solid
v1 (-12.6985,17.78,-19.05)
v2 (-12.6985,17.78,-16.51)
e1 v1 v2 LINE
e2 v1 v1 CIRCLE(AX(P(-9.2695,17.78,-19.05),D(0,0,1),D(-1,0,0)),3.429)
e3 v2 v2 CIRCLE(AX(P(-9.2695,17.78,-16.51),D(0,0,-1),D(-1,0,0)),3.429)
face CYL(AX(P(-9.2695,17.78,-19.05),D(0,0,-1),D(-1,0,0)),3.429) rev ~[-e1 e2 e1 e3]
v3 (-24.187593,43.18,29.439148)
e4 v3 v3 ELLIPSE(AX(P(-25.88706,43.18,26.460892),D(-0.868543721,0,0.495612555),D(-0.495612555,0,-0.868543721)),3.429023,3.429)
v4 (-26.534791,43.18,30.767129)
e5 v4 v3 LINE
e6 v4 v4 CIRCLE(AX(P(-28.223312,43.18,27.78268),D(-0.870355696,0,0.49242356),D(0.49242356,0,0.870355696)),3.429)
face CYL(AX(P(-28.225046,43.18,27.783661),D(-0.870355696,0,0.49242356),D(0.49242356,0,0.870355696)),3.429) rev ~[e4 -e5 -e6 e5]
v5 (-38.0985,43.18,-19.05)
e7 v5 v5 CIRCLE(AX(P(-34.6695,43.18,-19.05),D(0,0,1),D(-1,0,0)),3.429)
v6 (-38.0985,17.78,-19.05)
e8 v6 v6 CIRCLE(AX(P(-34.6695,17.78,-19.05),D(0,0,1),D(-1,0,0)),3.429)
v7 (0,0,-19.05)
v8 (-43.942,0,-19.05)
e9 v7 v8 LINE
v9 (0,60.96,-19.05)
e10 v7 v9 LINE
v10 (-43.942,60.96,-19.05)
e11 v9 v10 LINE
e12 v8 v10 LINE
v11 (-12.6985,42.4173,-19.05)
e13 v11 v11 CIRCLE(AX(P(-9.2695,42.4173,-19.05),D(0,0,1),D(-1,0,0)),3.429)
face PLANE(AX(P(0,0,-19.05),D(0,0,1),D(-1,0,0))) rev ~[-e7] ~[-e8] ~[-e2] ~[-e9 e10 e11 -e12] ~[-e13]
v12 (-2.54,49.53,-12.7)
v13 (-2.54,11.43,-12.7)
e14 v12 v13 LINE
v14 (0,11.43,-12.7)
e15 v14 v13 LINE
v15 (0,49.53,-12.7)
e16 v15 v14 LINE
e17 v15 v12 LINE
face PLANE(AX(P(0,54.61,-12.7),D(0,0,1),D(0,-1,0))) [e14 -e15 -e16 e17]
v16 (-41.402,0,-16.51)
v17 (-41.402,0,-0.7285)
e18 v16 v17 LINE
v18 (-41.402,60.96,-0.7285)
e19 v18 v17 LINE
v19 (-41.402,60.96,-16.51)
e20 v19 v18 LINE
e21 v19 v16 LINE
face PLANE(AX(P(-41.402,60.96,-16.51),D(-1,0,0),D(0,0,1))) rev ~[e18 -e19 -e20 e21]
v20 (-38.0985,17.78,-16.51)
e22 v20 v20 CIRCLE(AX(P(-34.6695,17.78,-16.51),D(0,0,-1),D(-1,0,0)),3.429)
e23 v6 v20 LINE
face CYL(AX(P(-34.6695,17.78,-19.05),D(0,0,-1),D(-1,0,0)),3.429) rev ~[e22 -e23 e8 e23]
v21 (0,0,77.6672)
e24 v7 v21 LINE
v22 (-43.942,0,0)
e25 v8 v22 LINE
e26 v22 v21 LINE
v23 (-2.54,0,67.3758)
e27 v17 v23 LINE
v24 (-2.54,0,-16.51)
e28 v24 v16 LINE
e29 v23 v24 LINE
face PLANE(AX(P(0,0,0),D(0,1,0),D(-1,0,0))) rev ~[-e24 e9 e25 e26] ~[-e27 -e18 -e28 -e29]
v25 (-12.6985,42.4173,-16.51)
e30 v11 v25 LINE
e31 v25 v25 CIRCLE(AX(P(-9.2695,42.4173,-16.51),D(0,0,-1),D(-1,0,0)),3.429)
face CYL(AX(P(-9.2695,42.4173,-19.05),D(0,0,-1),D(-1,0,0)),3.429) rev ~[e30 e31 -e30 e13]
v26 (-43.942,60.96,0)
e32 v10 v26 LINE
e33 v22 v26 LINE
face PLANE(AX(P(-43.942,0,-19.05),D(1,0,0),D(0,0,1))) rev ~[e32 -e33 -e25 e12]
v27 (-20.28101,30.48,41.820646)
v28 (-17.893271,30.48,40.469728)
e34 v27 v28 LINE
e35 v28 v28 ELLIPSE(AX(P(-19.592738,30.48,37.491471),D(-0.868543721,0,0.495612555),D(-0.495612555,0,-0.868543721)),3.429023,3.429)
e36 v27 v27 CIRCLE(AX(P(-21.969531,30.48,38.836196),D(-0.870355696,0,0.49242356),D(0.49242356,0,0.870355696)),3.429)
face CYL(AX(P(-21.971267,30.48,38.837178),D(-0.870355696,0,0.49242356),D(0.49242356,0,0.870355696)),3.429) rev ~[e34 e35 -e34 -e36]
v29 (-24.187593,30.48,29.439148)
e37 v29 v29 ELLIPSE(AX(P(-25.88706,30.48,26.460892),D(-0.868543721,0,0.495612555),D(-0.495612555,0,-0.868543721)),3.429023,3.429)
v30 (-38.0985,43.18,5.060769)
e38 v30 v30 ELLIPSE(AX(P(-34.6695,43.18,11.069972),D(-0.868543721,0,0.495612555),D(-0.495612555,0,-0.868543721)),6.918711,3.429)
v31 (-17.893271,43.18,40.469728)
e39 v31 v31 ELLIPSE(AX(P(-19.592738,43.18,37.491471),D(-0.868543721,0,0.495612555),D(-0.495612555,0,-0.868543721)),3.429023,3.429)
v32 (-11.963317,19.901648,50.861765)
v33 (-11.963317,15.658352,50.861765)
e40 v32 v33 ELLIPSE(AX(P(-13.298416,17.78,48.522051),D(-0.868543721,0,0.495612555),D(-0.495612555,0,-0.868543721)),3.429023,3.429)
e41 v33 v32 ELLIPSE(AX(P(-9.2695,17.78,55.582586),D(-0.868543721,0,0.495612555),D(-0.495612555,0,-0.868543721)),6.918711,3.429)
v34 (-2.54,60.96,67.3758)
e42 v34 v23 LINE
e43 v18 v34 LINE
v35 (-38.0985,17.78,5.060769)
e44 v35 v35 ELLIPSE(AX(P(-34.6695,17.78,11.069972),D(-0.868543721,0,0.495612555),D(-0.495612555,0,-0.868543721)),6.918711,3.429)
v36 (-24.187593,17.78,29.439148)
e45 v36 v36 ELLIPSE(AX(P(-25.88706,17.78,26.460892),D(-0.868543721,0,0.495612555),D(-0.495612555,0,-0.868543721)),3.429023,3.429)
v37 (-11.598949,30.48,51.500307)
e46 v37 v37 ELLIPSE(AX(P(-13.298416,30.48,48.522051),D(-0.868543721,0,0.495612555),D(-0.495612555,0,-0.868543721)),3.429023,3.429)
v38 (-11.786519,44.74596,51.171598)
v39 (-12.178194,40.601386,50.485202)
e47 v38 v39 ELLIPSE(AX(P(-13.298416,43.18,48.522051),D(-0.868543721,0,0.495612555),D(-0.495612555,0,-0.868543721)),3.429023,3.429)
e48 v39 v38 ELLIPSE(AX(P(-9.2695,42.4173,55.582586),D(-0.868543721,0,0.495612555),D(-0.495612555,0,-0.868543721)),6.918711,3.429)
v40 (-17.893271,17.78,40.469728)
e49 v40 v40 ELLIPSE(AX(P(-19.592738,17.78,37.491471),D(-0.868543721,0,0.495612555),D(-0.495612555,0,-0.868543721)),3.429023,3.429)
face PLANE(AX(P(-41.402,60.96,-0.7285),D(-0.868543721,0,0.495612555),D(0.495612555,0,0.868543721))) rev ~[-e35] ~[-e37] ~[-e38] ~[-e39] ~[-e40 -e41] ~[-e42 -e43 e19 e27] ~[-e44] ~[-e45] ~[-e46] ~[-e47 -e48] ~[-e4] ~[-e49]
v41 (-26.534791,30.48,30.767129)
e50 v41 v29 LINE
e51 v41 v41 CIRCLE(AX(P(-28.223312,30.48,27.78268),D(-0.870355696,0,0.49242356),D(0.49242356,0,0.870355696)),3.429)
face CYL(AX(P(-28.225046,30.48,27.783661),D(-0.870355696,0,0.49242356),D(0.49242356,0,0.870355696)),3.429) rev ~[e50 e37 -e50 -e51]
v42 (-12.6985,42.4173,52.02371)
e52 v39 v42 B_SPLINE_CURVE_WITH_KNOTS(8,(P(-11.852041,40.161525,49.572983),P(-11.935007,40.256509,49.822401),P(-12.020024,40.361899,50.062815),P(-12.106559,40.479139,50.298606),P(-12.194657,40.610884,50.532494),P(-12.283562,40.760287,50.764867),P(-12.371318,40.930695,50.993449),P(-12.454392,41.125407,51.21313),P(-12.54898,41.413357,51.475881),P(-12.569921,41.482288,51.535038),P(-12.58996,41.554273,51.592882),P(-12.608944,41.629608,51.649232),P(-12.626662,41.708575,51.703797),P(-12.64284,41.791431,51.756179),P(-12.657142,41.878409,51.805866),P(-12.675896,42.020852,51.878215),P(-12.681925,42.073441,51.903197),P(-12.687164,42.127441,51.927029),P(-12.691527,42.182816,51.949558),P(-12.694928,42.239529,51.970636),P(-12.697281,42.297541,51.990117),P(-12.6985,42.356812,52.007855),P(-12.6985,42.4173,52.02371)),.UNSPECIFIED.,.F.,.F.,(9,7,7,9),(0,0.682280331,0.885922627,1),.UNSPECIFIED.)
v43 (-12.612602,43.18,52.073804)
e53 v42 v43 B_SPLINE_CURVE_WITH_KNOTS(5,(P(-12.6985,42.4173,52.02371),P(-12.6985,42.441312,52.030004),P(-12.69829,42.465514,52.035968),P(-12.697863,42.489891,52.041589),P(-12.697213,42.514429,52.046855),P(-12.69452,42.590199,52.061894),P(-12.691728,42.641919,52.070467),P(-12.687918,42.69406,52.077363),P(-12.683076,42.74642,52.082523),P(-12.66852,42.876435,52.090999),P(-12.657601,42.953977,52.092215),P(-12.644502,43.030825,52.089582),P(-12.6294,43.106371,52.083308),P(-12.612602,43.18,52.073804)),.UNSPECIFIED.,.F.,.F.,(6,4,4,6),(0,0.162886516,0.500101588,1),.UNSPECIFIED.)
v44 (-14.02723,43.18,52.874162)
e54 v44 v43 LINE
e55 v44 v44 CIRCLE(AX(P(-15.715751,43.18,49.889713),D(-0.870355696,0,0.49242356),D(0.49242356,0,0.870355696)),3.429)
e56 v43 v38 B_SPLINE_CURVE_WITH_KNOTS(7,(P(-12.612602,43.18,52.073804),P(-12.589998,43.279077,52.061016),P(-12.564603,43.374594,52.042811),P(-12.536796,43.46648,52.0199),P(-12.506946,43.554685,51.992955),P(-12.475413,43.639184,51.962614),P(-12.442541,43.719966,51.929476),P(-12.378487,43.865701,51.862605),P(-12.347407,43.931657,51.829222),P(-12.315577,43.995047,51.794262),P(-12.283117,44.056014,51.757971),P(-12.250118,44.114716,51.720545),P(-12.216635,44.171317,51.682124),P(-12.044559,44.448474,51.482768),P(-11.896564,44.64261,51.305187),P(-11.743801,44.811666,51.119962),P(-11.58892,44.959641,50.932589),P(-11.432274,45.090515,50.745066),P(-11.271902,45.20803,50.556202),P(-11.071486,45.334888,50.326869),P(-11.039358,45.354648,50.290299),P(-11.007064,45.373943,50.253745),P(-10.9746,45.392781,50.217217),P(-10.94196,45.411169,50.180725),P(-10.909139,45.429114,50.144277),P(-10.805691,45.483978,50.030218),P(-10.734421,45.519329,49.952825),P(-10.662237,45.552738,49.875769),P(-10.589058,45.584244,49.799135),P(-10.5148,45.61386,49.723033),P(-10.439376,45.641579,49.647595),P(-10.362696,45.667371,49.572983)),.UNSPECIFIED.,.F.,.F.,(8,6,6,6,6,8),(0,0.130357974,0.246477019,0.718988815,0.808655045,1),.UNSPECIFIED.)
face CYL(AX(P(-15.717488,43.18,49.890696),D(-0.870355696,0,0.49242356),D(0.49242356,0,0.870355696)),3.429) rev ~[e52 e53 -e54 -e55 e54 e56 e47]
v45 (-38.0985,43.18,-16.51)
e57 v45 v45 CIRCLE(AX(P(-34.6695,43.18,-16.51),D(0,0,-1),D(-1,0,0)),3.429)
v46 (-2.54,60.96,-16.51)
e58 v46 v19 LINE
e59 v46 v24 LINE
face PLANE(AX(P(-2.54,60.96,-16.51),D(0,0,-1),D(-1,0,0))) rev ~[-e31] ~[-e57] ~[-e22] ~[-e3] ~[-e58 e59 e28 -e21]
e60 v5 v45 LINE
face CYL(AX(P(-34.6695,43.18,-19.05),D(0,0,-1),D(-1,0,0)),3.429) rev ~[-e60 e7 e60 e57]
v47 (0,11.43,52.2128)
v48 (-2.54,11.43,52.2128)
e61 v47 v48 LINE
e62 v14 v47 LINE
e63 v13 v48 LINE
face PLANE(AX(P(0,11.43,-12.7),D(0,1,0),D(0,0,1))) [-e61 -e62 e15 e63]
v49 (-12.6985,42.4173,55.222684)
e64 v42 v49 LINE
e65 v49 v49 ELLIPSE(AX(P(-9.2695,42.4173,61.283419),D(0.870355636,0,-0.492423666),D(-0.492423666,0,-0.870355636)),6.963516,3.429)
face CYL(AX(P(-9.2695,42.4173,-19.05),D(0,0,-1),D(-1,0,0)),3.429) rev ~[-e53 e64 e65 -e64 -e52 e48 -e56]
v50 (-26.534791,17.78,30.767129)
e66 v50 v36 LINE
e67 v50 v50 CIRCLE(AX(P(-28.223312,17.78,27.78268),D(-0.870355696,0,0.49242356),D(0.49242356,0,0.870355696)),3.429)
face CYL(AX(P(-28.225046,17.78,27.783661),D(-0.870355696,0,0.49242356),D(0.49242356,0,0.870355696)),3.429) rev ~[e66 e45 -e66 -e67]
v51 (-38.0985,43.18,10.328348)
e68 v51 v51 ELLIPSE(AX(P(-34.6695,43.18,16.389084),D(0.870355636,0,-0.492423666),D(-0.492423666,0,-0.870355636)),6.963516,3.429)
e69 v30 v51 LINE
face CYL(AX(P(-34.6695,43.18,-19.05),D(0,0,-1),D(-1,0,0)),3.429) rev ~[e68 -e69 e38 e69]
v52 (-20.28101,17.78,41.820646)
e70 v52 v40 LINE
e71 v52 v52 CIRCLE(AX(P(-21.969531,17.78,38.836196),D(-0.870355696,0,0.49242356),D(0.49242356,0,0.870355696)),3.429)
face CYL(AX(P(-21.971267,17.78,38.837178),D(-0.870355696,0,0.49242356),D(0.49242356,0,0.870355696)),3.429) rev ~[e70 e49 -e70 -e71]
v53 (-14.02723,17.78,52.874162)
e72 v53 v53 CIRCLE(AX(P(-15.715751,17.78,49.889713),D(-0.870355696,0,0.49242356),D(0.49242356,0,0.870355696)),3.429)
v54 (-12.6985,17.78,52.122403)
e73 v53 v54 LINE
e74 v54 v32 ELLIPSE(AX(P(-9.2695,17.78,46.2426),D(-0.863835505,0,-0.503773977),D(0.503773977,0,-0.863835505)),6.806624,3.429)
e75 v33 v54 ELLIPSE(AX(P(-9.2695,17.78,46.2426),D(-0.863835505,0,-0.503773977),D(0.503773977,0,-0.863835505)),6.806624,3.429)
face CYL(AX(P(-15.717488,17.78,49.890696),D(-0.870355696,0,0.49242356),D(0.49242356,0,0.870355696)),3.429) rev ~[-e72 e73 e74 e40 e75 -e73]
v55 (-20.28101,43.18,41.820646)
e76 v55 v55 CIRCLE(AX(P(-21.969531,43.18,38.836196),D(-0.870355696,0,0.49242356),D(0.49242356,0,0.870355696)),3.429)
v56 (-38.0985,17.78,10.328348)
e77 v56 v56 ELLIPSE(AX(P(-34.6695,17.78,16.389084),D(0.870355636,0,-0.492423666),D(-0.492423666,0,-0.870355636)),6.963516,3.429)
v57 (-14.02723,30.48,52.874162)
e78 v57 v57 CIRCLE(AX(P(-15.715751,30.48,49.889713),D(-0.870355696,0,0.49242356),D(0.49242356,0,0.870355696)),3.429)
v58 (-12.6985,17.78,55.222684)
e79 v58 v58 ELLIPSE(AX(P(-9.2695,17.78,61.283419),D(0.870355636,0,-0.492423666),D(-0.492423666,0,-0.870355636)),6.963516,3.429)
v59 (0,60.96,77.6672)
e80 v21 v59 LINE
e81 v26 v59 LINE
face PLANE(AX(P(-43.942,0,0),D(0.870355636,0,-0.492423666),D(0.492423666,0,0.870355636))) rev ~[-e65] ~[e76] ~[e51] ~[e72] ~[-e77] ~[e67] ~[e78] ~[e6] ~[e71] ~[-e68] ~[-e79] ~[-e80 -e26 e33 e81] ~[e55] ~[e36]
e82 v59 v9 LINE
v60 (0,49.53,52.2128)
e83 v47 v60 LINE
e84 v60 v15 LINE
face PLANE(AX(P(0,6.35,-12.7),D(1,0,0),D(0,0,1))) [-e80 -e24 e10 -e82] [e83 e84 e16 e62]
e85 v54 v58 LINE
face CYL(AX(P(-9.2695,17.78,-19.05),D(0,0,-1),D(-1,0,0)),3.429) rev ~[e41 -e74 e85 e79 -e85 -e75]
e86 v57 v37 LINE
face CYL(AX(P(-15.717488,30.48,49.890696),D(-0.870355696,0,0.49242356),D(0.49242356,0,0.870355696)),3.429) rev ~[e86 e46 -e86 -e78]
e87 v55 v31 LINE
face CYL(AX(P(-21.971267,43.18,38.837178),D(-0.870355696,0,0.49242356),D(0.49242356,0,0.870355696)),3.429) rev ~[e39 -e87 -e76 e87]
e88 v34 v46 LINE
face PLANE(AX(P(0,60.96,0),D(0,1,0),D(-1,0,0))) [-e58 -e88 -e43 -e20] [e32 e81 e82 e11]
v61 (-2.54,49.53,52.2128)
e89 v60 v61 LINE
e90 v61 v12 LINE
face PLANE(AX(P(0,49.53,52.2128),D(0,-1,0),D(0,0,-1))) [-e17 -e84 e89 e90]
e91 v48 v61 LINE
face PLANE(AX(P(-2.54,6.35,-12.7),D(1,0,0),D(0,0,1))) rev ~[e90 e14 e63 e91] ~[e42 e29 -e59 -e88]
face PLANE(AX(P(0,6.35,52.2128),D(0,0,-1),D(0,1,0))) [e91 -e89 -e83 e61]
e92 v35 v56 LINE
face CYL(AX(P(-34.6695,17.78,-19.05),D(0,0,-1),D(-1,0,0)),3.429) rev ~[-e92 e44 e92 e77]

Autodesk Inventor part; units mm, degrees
ref_plane "YZ Plane" through (0, 0, 0) normal (1, 0, 0) x (0, 1, 0)
ref_plane "XZ Plane" through (0, 0, 0) normal (0, 1, 0) x (-1, 0, 0)
ref_plane "XY Plane" through (0, 0, 0) normal (0, 0, 1) x (1, 0, 0)
sketch "Sketch1" plane through (0, 0, 0) normal (0, 1, 0) x (-1, 0, 0)
  line L0 (0, 0) -> (0, -19.05)
  line L1 (0, -19.05) -> (43.942, -19.05)
  line L2 (43.942, -19.05) -> (43.942, 0)
  line L3 (43.942, 0) -> (0, 0)
  line L4 (0, 0) -> (0, 155.3344)
  line L5 (43.942, 0) -> (0, 77.6672)
  dimension "d0" = 19.05
  dimension "d1" = 43.942
  dimension "d2" = 60.5
extrude "Extrusion1" add sketch "Sketch1" along normal blind 60.96
sketch "Sketch6" plane through (0, 60.96, 0) normal (0, 1, 0) x (1, 0, 0)
  line L0 (0, 19.05) -> (-43.942, 19.05) projected
  line L1 (0, -76.952) -> (0, 19.05)
  line L2 (0, 19.05) -> (-43.942, 19.05)
  line L3 (-43.942, 19.05) -> (-43.942, 0.0548)
  line L4 (-43.942, 0.0548) -> (0, -76.952)
  line L5 (-2.54, -67.3758) -> (-2.54, 16.51)
  line L6 (-2.54, 16.51) -> (-41.402, 16.51)
  line L7 (-41.402, 16.51) -> (-41.402, 0.7285)
  line L8 (-41.402, 0.7285) -> (-2.54, -67.3758)
  point P0 (0, 0)
  dimension "d26" = 2.54
extrude "Extrusion5" cut sketch "Sketch6" against normal blind 76.2 contours L8 L7 L6 L5
sketch "Sketch2" plane through (0, 0, 77.6672) normal (-0.8703557, 0, 0.4924236) x (0.4924236, 0, 0.8703557)
  line L0 (0, 60.96) -> (-84.1784, 60.96) projected
  line L1 (0, 60.96) -> (-14.1351, 60.96)
  line L2 (-14.1351, 60.96) -> (-14.1351, 0)
  line L3 (0, 0) -> (-84.1784, 0) projected
  line L4 (-14.1351, 60.96) -> (-75.0951, 60.96)
  line L5 (-75.0951, 60.96) -> (-75.0951, 0)
  line L6 (-75.0951, 0) -> (-14.1351, 0)
  line L7 (-14.1351, 60.96) -> (-44.6151, 60.96)
  line L8 (-44.6151, 60.96) -> (-44.6151, 0)
  line L9 (-75.0951, 30.48) -> (-14.1351, 30.48)
  line L10 (-44.6151, 30.48) -> (-19.6139, 30.48)
  line L11 (-44.6151, 30.48) -> (-31.9151, 30.48)
  line L12 (-31.9151, 30.48) -> (-31.9151, 43.18)
  line L13 (-31.9151, 43.18) -> (-44.6151, 43.18)
  line L14 (-44.6151, 43.18) -> (-57.3151, 43.18)
  line L15 (-57.3151, 43.18) -> (-57.3151, 30.48)
  line L16 (-57.3151, 30.48) -> (-57.3151, 17.78)
  line L17 (-57.3151, 17.78) -> (-44.6151, 17.78)
  line L18 (-44.6151, 17.78) -> (-31.9151, 17.78)
  line L19 (-31.9151, 30.48) -> (-31.9151, 17.78)
  circle A0 centre (-44.6151, 30.48) radius 3.429
  circle A1 centre (-31.9151, 30.48) radius 3.429
  circle A2 centre (-31.9151, 17.78) radius 3.429
  circle A3 centre (-44.6151, 17.78) radius 3.429
  circle A4 centre (-57.3151, 17.78) radius 3.429
  circle A5 centre (-57.3151, 30.48) radius 3.429
  circle A6 centre (-57.3151, 43.18) radius 3.429
  circle A7 centre (-44.6151, 43.18) radius 3.429
  circle A8 centre (-31.9151, 43.18) radius 3.429
  point P0 (-67.5981, 0)
  dimension "d5" = 14.1351
  dimension "d6" = 60.96
  dimension "d7" = 30.48
  dimension "d8" = 25.0012
  dimension "d9" = 12.7
  dimension "d10" = 12.7
  dimension "d11" = 12.7
  dimension "d12" = 12.7
  dimension "d29" = 6.858
  dimension "d30" = 6.858
  dimension "d31" = 6.858
  dimension "d32" = 6.858
  dimension "d33" = 6.858
  dimension "d34" = 6.858
  dimension "d35" = 6.858
  dimension "d36" = 6.858
  dimension "d37" = 6.858
hole "Hole1" [suppressed]
extrude "Extrusion6" [suppressed]
sketch "Sketch7" plane through (0, 0, 77.6672) normal (1, 0, 0) x (0, 0, -1)
  line L0 (96.7172, 0) -> (96.7172, 60.96) projected
  line L1 (96.7172, 60.96) -> (96.7172, 0)
  line L2 (96.7172, 0) -> (19.1044, 0)
  line L3 (19.1044, 0) -> (19.1044, 60.96)
  line L4 (19.1044, 60.96) -> (96.7172, 60.96)
  line L5 (90.3672, 54.61) -> (90.3672, 6.35)
  line L6 (90.3672, 6.35) -> (25.4544, 6.35)
  line L7 (25.4544, 6.35) -> (25.4544, 54.61)
  line L8 (25.4544, 54.61) -> (90.3672, 54.61)
  point P0 (77.6672, 0)
  dimension "d40" = 6.35
extrude "Extrusion7" cut sketch "Sketch7" against normal blind 5.08 contours L5 L6 L7 L8
sketch "Sketch8" plane through (0, 0, -19.05) normal (0, 0, -1) x (-1, 0, 0)
  line L0 (41.402, 60.96) -> (2.54, 60.96) projected
  line L1 (21.971, 60.96) -> (21.971, 0)
  line L2 (21.971, 0) -> (21.9695, 30.48)
  line L3 (21.971, 0) -> (21.9695, 30.48)
  line L4 (21.9695, 30.48) -> (0, 30.48)
  line L5 (0, 30.48) -> (43.942, 30.48)
  line L6 (43.942, 0) -> (43.942, 60.96) projected
  line L7 (21.9695, 30.48) -> (34.6695, 30.48)
  line L8 (34.6695, 30.48) -> (34.6695, 43.18)
  line L9 (34.6695, 43.18) -> (9.2695, 43.18)
  line L10 (9.2695, 43.18) -> (9.2695, 17.78)
  line L11 (9.2695, 17.78) -> (34.6695, 17.78)
  circle A0 centre (9.2695, 42.4173) radius 3.429
  circle A1 centre (34.6695, 43.18) radius 3.429
  circle A2 centre (9.2695, 17.78) radius 3.429
  circle A3 centre (34.6695, 17.78) radius 3.429
  point P0 (0, 0)
  dimension "d43" = 12.7
  dimension "d44" = 12.7
  dimension "d45" = 25.4
  dimension "d47" = 25.4
  dimension "d48" = 25.4
  dimension "d49" = 6.858
  dimension "d50" = 6.858
  dimension "d51" = 6.858
  dimension "d52" = 6.858
extrude "Extrusion8" [suppressed]
extrude "Extrusion9" cut sketch "Sketch8" against normal blind 101.6 contours A1 L8 L9 | L9 L8 A1 | A0 L10 L9 | L9 L10 A0 | A2 L10 L11 | L11 L10 A2 | A3
extrude "Extrusion10" cut sketch "Sketch2" against normal blind 25.4 contours A7 L13 L8 | L8 L14 A7 | L13 A7 L8 | L8 A7 L14 | A1 L19 L9 | L9 L12 A1 | A5 L15 L9 | L9 L16 A5 | A8 L12 L13 | L13 L12 A8 | A6 L15 L14 | L14 L15 A6 | A3 L17 L8 | L8 L18 A3 | L19 A1 L9 | L9 A1 L12 | L15 A5 L9 | L9 A5 L16 | A0 L9 L8 | L8 L9 A0 | L17 A3 L8 | L8 A3 L18 | A2 L18 L19 | L19 L18 A2 | A4 L17 L16 | L16 L17 A4 | L9 A0 L8 | L8 A0 L9
thicken "Thicken2" operation add thickness 5.08 both sides no extend neighbours no toward (0, -1, 0) faces at (-1.6933, 54.61, 30.5752)
thicken "Thicken3" operation add thickness 5.08 both sides no extend neighbours no toward (0, 1, 0) faces at (-0.8467, 6.35, 30.5752)
properties part number "AngleMount"
